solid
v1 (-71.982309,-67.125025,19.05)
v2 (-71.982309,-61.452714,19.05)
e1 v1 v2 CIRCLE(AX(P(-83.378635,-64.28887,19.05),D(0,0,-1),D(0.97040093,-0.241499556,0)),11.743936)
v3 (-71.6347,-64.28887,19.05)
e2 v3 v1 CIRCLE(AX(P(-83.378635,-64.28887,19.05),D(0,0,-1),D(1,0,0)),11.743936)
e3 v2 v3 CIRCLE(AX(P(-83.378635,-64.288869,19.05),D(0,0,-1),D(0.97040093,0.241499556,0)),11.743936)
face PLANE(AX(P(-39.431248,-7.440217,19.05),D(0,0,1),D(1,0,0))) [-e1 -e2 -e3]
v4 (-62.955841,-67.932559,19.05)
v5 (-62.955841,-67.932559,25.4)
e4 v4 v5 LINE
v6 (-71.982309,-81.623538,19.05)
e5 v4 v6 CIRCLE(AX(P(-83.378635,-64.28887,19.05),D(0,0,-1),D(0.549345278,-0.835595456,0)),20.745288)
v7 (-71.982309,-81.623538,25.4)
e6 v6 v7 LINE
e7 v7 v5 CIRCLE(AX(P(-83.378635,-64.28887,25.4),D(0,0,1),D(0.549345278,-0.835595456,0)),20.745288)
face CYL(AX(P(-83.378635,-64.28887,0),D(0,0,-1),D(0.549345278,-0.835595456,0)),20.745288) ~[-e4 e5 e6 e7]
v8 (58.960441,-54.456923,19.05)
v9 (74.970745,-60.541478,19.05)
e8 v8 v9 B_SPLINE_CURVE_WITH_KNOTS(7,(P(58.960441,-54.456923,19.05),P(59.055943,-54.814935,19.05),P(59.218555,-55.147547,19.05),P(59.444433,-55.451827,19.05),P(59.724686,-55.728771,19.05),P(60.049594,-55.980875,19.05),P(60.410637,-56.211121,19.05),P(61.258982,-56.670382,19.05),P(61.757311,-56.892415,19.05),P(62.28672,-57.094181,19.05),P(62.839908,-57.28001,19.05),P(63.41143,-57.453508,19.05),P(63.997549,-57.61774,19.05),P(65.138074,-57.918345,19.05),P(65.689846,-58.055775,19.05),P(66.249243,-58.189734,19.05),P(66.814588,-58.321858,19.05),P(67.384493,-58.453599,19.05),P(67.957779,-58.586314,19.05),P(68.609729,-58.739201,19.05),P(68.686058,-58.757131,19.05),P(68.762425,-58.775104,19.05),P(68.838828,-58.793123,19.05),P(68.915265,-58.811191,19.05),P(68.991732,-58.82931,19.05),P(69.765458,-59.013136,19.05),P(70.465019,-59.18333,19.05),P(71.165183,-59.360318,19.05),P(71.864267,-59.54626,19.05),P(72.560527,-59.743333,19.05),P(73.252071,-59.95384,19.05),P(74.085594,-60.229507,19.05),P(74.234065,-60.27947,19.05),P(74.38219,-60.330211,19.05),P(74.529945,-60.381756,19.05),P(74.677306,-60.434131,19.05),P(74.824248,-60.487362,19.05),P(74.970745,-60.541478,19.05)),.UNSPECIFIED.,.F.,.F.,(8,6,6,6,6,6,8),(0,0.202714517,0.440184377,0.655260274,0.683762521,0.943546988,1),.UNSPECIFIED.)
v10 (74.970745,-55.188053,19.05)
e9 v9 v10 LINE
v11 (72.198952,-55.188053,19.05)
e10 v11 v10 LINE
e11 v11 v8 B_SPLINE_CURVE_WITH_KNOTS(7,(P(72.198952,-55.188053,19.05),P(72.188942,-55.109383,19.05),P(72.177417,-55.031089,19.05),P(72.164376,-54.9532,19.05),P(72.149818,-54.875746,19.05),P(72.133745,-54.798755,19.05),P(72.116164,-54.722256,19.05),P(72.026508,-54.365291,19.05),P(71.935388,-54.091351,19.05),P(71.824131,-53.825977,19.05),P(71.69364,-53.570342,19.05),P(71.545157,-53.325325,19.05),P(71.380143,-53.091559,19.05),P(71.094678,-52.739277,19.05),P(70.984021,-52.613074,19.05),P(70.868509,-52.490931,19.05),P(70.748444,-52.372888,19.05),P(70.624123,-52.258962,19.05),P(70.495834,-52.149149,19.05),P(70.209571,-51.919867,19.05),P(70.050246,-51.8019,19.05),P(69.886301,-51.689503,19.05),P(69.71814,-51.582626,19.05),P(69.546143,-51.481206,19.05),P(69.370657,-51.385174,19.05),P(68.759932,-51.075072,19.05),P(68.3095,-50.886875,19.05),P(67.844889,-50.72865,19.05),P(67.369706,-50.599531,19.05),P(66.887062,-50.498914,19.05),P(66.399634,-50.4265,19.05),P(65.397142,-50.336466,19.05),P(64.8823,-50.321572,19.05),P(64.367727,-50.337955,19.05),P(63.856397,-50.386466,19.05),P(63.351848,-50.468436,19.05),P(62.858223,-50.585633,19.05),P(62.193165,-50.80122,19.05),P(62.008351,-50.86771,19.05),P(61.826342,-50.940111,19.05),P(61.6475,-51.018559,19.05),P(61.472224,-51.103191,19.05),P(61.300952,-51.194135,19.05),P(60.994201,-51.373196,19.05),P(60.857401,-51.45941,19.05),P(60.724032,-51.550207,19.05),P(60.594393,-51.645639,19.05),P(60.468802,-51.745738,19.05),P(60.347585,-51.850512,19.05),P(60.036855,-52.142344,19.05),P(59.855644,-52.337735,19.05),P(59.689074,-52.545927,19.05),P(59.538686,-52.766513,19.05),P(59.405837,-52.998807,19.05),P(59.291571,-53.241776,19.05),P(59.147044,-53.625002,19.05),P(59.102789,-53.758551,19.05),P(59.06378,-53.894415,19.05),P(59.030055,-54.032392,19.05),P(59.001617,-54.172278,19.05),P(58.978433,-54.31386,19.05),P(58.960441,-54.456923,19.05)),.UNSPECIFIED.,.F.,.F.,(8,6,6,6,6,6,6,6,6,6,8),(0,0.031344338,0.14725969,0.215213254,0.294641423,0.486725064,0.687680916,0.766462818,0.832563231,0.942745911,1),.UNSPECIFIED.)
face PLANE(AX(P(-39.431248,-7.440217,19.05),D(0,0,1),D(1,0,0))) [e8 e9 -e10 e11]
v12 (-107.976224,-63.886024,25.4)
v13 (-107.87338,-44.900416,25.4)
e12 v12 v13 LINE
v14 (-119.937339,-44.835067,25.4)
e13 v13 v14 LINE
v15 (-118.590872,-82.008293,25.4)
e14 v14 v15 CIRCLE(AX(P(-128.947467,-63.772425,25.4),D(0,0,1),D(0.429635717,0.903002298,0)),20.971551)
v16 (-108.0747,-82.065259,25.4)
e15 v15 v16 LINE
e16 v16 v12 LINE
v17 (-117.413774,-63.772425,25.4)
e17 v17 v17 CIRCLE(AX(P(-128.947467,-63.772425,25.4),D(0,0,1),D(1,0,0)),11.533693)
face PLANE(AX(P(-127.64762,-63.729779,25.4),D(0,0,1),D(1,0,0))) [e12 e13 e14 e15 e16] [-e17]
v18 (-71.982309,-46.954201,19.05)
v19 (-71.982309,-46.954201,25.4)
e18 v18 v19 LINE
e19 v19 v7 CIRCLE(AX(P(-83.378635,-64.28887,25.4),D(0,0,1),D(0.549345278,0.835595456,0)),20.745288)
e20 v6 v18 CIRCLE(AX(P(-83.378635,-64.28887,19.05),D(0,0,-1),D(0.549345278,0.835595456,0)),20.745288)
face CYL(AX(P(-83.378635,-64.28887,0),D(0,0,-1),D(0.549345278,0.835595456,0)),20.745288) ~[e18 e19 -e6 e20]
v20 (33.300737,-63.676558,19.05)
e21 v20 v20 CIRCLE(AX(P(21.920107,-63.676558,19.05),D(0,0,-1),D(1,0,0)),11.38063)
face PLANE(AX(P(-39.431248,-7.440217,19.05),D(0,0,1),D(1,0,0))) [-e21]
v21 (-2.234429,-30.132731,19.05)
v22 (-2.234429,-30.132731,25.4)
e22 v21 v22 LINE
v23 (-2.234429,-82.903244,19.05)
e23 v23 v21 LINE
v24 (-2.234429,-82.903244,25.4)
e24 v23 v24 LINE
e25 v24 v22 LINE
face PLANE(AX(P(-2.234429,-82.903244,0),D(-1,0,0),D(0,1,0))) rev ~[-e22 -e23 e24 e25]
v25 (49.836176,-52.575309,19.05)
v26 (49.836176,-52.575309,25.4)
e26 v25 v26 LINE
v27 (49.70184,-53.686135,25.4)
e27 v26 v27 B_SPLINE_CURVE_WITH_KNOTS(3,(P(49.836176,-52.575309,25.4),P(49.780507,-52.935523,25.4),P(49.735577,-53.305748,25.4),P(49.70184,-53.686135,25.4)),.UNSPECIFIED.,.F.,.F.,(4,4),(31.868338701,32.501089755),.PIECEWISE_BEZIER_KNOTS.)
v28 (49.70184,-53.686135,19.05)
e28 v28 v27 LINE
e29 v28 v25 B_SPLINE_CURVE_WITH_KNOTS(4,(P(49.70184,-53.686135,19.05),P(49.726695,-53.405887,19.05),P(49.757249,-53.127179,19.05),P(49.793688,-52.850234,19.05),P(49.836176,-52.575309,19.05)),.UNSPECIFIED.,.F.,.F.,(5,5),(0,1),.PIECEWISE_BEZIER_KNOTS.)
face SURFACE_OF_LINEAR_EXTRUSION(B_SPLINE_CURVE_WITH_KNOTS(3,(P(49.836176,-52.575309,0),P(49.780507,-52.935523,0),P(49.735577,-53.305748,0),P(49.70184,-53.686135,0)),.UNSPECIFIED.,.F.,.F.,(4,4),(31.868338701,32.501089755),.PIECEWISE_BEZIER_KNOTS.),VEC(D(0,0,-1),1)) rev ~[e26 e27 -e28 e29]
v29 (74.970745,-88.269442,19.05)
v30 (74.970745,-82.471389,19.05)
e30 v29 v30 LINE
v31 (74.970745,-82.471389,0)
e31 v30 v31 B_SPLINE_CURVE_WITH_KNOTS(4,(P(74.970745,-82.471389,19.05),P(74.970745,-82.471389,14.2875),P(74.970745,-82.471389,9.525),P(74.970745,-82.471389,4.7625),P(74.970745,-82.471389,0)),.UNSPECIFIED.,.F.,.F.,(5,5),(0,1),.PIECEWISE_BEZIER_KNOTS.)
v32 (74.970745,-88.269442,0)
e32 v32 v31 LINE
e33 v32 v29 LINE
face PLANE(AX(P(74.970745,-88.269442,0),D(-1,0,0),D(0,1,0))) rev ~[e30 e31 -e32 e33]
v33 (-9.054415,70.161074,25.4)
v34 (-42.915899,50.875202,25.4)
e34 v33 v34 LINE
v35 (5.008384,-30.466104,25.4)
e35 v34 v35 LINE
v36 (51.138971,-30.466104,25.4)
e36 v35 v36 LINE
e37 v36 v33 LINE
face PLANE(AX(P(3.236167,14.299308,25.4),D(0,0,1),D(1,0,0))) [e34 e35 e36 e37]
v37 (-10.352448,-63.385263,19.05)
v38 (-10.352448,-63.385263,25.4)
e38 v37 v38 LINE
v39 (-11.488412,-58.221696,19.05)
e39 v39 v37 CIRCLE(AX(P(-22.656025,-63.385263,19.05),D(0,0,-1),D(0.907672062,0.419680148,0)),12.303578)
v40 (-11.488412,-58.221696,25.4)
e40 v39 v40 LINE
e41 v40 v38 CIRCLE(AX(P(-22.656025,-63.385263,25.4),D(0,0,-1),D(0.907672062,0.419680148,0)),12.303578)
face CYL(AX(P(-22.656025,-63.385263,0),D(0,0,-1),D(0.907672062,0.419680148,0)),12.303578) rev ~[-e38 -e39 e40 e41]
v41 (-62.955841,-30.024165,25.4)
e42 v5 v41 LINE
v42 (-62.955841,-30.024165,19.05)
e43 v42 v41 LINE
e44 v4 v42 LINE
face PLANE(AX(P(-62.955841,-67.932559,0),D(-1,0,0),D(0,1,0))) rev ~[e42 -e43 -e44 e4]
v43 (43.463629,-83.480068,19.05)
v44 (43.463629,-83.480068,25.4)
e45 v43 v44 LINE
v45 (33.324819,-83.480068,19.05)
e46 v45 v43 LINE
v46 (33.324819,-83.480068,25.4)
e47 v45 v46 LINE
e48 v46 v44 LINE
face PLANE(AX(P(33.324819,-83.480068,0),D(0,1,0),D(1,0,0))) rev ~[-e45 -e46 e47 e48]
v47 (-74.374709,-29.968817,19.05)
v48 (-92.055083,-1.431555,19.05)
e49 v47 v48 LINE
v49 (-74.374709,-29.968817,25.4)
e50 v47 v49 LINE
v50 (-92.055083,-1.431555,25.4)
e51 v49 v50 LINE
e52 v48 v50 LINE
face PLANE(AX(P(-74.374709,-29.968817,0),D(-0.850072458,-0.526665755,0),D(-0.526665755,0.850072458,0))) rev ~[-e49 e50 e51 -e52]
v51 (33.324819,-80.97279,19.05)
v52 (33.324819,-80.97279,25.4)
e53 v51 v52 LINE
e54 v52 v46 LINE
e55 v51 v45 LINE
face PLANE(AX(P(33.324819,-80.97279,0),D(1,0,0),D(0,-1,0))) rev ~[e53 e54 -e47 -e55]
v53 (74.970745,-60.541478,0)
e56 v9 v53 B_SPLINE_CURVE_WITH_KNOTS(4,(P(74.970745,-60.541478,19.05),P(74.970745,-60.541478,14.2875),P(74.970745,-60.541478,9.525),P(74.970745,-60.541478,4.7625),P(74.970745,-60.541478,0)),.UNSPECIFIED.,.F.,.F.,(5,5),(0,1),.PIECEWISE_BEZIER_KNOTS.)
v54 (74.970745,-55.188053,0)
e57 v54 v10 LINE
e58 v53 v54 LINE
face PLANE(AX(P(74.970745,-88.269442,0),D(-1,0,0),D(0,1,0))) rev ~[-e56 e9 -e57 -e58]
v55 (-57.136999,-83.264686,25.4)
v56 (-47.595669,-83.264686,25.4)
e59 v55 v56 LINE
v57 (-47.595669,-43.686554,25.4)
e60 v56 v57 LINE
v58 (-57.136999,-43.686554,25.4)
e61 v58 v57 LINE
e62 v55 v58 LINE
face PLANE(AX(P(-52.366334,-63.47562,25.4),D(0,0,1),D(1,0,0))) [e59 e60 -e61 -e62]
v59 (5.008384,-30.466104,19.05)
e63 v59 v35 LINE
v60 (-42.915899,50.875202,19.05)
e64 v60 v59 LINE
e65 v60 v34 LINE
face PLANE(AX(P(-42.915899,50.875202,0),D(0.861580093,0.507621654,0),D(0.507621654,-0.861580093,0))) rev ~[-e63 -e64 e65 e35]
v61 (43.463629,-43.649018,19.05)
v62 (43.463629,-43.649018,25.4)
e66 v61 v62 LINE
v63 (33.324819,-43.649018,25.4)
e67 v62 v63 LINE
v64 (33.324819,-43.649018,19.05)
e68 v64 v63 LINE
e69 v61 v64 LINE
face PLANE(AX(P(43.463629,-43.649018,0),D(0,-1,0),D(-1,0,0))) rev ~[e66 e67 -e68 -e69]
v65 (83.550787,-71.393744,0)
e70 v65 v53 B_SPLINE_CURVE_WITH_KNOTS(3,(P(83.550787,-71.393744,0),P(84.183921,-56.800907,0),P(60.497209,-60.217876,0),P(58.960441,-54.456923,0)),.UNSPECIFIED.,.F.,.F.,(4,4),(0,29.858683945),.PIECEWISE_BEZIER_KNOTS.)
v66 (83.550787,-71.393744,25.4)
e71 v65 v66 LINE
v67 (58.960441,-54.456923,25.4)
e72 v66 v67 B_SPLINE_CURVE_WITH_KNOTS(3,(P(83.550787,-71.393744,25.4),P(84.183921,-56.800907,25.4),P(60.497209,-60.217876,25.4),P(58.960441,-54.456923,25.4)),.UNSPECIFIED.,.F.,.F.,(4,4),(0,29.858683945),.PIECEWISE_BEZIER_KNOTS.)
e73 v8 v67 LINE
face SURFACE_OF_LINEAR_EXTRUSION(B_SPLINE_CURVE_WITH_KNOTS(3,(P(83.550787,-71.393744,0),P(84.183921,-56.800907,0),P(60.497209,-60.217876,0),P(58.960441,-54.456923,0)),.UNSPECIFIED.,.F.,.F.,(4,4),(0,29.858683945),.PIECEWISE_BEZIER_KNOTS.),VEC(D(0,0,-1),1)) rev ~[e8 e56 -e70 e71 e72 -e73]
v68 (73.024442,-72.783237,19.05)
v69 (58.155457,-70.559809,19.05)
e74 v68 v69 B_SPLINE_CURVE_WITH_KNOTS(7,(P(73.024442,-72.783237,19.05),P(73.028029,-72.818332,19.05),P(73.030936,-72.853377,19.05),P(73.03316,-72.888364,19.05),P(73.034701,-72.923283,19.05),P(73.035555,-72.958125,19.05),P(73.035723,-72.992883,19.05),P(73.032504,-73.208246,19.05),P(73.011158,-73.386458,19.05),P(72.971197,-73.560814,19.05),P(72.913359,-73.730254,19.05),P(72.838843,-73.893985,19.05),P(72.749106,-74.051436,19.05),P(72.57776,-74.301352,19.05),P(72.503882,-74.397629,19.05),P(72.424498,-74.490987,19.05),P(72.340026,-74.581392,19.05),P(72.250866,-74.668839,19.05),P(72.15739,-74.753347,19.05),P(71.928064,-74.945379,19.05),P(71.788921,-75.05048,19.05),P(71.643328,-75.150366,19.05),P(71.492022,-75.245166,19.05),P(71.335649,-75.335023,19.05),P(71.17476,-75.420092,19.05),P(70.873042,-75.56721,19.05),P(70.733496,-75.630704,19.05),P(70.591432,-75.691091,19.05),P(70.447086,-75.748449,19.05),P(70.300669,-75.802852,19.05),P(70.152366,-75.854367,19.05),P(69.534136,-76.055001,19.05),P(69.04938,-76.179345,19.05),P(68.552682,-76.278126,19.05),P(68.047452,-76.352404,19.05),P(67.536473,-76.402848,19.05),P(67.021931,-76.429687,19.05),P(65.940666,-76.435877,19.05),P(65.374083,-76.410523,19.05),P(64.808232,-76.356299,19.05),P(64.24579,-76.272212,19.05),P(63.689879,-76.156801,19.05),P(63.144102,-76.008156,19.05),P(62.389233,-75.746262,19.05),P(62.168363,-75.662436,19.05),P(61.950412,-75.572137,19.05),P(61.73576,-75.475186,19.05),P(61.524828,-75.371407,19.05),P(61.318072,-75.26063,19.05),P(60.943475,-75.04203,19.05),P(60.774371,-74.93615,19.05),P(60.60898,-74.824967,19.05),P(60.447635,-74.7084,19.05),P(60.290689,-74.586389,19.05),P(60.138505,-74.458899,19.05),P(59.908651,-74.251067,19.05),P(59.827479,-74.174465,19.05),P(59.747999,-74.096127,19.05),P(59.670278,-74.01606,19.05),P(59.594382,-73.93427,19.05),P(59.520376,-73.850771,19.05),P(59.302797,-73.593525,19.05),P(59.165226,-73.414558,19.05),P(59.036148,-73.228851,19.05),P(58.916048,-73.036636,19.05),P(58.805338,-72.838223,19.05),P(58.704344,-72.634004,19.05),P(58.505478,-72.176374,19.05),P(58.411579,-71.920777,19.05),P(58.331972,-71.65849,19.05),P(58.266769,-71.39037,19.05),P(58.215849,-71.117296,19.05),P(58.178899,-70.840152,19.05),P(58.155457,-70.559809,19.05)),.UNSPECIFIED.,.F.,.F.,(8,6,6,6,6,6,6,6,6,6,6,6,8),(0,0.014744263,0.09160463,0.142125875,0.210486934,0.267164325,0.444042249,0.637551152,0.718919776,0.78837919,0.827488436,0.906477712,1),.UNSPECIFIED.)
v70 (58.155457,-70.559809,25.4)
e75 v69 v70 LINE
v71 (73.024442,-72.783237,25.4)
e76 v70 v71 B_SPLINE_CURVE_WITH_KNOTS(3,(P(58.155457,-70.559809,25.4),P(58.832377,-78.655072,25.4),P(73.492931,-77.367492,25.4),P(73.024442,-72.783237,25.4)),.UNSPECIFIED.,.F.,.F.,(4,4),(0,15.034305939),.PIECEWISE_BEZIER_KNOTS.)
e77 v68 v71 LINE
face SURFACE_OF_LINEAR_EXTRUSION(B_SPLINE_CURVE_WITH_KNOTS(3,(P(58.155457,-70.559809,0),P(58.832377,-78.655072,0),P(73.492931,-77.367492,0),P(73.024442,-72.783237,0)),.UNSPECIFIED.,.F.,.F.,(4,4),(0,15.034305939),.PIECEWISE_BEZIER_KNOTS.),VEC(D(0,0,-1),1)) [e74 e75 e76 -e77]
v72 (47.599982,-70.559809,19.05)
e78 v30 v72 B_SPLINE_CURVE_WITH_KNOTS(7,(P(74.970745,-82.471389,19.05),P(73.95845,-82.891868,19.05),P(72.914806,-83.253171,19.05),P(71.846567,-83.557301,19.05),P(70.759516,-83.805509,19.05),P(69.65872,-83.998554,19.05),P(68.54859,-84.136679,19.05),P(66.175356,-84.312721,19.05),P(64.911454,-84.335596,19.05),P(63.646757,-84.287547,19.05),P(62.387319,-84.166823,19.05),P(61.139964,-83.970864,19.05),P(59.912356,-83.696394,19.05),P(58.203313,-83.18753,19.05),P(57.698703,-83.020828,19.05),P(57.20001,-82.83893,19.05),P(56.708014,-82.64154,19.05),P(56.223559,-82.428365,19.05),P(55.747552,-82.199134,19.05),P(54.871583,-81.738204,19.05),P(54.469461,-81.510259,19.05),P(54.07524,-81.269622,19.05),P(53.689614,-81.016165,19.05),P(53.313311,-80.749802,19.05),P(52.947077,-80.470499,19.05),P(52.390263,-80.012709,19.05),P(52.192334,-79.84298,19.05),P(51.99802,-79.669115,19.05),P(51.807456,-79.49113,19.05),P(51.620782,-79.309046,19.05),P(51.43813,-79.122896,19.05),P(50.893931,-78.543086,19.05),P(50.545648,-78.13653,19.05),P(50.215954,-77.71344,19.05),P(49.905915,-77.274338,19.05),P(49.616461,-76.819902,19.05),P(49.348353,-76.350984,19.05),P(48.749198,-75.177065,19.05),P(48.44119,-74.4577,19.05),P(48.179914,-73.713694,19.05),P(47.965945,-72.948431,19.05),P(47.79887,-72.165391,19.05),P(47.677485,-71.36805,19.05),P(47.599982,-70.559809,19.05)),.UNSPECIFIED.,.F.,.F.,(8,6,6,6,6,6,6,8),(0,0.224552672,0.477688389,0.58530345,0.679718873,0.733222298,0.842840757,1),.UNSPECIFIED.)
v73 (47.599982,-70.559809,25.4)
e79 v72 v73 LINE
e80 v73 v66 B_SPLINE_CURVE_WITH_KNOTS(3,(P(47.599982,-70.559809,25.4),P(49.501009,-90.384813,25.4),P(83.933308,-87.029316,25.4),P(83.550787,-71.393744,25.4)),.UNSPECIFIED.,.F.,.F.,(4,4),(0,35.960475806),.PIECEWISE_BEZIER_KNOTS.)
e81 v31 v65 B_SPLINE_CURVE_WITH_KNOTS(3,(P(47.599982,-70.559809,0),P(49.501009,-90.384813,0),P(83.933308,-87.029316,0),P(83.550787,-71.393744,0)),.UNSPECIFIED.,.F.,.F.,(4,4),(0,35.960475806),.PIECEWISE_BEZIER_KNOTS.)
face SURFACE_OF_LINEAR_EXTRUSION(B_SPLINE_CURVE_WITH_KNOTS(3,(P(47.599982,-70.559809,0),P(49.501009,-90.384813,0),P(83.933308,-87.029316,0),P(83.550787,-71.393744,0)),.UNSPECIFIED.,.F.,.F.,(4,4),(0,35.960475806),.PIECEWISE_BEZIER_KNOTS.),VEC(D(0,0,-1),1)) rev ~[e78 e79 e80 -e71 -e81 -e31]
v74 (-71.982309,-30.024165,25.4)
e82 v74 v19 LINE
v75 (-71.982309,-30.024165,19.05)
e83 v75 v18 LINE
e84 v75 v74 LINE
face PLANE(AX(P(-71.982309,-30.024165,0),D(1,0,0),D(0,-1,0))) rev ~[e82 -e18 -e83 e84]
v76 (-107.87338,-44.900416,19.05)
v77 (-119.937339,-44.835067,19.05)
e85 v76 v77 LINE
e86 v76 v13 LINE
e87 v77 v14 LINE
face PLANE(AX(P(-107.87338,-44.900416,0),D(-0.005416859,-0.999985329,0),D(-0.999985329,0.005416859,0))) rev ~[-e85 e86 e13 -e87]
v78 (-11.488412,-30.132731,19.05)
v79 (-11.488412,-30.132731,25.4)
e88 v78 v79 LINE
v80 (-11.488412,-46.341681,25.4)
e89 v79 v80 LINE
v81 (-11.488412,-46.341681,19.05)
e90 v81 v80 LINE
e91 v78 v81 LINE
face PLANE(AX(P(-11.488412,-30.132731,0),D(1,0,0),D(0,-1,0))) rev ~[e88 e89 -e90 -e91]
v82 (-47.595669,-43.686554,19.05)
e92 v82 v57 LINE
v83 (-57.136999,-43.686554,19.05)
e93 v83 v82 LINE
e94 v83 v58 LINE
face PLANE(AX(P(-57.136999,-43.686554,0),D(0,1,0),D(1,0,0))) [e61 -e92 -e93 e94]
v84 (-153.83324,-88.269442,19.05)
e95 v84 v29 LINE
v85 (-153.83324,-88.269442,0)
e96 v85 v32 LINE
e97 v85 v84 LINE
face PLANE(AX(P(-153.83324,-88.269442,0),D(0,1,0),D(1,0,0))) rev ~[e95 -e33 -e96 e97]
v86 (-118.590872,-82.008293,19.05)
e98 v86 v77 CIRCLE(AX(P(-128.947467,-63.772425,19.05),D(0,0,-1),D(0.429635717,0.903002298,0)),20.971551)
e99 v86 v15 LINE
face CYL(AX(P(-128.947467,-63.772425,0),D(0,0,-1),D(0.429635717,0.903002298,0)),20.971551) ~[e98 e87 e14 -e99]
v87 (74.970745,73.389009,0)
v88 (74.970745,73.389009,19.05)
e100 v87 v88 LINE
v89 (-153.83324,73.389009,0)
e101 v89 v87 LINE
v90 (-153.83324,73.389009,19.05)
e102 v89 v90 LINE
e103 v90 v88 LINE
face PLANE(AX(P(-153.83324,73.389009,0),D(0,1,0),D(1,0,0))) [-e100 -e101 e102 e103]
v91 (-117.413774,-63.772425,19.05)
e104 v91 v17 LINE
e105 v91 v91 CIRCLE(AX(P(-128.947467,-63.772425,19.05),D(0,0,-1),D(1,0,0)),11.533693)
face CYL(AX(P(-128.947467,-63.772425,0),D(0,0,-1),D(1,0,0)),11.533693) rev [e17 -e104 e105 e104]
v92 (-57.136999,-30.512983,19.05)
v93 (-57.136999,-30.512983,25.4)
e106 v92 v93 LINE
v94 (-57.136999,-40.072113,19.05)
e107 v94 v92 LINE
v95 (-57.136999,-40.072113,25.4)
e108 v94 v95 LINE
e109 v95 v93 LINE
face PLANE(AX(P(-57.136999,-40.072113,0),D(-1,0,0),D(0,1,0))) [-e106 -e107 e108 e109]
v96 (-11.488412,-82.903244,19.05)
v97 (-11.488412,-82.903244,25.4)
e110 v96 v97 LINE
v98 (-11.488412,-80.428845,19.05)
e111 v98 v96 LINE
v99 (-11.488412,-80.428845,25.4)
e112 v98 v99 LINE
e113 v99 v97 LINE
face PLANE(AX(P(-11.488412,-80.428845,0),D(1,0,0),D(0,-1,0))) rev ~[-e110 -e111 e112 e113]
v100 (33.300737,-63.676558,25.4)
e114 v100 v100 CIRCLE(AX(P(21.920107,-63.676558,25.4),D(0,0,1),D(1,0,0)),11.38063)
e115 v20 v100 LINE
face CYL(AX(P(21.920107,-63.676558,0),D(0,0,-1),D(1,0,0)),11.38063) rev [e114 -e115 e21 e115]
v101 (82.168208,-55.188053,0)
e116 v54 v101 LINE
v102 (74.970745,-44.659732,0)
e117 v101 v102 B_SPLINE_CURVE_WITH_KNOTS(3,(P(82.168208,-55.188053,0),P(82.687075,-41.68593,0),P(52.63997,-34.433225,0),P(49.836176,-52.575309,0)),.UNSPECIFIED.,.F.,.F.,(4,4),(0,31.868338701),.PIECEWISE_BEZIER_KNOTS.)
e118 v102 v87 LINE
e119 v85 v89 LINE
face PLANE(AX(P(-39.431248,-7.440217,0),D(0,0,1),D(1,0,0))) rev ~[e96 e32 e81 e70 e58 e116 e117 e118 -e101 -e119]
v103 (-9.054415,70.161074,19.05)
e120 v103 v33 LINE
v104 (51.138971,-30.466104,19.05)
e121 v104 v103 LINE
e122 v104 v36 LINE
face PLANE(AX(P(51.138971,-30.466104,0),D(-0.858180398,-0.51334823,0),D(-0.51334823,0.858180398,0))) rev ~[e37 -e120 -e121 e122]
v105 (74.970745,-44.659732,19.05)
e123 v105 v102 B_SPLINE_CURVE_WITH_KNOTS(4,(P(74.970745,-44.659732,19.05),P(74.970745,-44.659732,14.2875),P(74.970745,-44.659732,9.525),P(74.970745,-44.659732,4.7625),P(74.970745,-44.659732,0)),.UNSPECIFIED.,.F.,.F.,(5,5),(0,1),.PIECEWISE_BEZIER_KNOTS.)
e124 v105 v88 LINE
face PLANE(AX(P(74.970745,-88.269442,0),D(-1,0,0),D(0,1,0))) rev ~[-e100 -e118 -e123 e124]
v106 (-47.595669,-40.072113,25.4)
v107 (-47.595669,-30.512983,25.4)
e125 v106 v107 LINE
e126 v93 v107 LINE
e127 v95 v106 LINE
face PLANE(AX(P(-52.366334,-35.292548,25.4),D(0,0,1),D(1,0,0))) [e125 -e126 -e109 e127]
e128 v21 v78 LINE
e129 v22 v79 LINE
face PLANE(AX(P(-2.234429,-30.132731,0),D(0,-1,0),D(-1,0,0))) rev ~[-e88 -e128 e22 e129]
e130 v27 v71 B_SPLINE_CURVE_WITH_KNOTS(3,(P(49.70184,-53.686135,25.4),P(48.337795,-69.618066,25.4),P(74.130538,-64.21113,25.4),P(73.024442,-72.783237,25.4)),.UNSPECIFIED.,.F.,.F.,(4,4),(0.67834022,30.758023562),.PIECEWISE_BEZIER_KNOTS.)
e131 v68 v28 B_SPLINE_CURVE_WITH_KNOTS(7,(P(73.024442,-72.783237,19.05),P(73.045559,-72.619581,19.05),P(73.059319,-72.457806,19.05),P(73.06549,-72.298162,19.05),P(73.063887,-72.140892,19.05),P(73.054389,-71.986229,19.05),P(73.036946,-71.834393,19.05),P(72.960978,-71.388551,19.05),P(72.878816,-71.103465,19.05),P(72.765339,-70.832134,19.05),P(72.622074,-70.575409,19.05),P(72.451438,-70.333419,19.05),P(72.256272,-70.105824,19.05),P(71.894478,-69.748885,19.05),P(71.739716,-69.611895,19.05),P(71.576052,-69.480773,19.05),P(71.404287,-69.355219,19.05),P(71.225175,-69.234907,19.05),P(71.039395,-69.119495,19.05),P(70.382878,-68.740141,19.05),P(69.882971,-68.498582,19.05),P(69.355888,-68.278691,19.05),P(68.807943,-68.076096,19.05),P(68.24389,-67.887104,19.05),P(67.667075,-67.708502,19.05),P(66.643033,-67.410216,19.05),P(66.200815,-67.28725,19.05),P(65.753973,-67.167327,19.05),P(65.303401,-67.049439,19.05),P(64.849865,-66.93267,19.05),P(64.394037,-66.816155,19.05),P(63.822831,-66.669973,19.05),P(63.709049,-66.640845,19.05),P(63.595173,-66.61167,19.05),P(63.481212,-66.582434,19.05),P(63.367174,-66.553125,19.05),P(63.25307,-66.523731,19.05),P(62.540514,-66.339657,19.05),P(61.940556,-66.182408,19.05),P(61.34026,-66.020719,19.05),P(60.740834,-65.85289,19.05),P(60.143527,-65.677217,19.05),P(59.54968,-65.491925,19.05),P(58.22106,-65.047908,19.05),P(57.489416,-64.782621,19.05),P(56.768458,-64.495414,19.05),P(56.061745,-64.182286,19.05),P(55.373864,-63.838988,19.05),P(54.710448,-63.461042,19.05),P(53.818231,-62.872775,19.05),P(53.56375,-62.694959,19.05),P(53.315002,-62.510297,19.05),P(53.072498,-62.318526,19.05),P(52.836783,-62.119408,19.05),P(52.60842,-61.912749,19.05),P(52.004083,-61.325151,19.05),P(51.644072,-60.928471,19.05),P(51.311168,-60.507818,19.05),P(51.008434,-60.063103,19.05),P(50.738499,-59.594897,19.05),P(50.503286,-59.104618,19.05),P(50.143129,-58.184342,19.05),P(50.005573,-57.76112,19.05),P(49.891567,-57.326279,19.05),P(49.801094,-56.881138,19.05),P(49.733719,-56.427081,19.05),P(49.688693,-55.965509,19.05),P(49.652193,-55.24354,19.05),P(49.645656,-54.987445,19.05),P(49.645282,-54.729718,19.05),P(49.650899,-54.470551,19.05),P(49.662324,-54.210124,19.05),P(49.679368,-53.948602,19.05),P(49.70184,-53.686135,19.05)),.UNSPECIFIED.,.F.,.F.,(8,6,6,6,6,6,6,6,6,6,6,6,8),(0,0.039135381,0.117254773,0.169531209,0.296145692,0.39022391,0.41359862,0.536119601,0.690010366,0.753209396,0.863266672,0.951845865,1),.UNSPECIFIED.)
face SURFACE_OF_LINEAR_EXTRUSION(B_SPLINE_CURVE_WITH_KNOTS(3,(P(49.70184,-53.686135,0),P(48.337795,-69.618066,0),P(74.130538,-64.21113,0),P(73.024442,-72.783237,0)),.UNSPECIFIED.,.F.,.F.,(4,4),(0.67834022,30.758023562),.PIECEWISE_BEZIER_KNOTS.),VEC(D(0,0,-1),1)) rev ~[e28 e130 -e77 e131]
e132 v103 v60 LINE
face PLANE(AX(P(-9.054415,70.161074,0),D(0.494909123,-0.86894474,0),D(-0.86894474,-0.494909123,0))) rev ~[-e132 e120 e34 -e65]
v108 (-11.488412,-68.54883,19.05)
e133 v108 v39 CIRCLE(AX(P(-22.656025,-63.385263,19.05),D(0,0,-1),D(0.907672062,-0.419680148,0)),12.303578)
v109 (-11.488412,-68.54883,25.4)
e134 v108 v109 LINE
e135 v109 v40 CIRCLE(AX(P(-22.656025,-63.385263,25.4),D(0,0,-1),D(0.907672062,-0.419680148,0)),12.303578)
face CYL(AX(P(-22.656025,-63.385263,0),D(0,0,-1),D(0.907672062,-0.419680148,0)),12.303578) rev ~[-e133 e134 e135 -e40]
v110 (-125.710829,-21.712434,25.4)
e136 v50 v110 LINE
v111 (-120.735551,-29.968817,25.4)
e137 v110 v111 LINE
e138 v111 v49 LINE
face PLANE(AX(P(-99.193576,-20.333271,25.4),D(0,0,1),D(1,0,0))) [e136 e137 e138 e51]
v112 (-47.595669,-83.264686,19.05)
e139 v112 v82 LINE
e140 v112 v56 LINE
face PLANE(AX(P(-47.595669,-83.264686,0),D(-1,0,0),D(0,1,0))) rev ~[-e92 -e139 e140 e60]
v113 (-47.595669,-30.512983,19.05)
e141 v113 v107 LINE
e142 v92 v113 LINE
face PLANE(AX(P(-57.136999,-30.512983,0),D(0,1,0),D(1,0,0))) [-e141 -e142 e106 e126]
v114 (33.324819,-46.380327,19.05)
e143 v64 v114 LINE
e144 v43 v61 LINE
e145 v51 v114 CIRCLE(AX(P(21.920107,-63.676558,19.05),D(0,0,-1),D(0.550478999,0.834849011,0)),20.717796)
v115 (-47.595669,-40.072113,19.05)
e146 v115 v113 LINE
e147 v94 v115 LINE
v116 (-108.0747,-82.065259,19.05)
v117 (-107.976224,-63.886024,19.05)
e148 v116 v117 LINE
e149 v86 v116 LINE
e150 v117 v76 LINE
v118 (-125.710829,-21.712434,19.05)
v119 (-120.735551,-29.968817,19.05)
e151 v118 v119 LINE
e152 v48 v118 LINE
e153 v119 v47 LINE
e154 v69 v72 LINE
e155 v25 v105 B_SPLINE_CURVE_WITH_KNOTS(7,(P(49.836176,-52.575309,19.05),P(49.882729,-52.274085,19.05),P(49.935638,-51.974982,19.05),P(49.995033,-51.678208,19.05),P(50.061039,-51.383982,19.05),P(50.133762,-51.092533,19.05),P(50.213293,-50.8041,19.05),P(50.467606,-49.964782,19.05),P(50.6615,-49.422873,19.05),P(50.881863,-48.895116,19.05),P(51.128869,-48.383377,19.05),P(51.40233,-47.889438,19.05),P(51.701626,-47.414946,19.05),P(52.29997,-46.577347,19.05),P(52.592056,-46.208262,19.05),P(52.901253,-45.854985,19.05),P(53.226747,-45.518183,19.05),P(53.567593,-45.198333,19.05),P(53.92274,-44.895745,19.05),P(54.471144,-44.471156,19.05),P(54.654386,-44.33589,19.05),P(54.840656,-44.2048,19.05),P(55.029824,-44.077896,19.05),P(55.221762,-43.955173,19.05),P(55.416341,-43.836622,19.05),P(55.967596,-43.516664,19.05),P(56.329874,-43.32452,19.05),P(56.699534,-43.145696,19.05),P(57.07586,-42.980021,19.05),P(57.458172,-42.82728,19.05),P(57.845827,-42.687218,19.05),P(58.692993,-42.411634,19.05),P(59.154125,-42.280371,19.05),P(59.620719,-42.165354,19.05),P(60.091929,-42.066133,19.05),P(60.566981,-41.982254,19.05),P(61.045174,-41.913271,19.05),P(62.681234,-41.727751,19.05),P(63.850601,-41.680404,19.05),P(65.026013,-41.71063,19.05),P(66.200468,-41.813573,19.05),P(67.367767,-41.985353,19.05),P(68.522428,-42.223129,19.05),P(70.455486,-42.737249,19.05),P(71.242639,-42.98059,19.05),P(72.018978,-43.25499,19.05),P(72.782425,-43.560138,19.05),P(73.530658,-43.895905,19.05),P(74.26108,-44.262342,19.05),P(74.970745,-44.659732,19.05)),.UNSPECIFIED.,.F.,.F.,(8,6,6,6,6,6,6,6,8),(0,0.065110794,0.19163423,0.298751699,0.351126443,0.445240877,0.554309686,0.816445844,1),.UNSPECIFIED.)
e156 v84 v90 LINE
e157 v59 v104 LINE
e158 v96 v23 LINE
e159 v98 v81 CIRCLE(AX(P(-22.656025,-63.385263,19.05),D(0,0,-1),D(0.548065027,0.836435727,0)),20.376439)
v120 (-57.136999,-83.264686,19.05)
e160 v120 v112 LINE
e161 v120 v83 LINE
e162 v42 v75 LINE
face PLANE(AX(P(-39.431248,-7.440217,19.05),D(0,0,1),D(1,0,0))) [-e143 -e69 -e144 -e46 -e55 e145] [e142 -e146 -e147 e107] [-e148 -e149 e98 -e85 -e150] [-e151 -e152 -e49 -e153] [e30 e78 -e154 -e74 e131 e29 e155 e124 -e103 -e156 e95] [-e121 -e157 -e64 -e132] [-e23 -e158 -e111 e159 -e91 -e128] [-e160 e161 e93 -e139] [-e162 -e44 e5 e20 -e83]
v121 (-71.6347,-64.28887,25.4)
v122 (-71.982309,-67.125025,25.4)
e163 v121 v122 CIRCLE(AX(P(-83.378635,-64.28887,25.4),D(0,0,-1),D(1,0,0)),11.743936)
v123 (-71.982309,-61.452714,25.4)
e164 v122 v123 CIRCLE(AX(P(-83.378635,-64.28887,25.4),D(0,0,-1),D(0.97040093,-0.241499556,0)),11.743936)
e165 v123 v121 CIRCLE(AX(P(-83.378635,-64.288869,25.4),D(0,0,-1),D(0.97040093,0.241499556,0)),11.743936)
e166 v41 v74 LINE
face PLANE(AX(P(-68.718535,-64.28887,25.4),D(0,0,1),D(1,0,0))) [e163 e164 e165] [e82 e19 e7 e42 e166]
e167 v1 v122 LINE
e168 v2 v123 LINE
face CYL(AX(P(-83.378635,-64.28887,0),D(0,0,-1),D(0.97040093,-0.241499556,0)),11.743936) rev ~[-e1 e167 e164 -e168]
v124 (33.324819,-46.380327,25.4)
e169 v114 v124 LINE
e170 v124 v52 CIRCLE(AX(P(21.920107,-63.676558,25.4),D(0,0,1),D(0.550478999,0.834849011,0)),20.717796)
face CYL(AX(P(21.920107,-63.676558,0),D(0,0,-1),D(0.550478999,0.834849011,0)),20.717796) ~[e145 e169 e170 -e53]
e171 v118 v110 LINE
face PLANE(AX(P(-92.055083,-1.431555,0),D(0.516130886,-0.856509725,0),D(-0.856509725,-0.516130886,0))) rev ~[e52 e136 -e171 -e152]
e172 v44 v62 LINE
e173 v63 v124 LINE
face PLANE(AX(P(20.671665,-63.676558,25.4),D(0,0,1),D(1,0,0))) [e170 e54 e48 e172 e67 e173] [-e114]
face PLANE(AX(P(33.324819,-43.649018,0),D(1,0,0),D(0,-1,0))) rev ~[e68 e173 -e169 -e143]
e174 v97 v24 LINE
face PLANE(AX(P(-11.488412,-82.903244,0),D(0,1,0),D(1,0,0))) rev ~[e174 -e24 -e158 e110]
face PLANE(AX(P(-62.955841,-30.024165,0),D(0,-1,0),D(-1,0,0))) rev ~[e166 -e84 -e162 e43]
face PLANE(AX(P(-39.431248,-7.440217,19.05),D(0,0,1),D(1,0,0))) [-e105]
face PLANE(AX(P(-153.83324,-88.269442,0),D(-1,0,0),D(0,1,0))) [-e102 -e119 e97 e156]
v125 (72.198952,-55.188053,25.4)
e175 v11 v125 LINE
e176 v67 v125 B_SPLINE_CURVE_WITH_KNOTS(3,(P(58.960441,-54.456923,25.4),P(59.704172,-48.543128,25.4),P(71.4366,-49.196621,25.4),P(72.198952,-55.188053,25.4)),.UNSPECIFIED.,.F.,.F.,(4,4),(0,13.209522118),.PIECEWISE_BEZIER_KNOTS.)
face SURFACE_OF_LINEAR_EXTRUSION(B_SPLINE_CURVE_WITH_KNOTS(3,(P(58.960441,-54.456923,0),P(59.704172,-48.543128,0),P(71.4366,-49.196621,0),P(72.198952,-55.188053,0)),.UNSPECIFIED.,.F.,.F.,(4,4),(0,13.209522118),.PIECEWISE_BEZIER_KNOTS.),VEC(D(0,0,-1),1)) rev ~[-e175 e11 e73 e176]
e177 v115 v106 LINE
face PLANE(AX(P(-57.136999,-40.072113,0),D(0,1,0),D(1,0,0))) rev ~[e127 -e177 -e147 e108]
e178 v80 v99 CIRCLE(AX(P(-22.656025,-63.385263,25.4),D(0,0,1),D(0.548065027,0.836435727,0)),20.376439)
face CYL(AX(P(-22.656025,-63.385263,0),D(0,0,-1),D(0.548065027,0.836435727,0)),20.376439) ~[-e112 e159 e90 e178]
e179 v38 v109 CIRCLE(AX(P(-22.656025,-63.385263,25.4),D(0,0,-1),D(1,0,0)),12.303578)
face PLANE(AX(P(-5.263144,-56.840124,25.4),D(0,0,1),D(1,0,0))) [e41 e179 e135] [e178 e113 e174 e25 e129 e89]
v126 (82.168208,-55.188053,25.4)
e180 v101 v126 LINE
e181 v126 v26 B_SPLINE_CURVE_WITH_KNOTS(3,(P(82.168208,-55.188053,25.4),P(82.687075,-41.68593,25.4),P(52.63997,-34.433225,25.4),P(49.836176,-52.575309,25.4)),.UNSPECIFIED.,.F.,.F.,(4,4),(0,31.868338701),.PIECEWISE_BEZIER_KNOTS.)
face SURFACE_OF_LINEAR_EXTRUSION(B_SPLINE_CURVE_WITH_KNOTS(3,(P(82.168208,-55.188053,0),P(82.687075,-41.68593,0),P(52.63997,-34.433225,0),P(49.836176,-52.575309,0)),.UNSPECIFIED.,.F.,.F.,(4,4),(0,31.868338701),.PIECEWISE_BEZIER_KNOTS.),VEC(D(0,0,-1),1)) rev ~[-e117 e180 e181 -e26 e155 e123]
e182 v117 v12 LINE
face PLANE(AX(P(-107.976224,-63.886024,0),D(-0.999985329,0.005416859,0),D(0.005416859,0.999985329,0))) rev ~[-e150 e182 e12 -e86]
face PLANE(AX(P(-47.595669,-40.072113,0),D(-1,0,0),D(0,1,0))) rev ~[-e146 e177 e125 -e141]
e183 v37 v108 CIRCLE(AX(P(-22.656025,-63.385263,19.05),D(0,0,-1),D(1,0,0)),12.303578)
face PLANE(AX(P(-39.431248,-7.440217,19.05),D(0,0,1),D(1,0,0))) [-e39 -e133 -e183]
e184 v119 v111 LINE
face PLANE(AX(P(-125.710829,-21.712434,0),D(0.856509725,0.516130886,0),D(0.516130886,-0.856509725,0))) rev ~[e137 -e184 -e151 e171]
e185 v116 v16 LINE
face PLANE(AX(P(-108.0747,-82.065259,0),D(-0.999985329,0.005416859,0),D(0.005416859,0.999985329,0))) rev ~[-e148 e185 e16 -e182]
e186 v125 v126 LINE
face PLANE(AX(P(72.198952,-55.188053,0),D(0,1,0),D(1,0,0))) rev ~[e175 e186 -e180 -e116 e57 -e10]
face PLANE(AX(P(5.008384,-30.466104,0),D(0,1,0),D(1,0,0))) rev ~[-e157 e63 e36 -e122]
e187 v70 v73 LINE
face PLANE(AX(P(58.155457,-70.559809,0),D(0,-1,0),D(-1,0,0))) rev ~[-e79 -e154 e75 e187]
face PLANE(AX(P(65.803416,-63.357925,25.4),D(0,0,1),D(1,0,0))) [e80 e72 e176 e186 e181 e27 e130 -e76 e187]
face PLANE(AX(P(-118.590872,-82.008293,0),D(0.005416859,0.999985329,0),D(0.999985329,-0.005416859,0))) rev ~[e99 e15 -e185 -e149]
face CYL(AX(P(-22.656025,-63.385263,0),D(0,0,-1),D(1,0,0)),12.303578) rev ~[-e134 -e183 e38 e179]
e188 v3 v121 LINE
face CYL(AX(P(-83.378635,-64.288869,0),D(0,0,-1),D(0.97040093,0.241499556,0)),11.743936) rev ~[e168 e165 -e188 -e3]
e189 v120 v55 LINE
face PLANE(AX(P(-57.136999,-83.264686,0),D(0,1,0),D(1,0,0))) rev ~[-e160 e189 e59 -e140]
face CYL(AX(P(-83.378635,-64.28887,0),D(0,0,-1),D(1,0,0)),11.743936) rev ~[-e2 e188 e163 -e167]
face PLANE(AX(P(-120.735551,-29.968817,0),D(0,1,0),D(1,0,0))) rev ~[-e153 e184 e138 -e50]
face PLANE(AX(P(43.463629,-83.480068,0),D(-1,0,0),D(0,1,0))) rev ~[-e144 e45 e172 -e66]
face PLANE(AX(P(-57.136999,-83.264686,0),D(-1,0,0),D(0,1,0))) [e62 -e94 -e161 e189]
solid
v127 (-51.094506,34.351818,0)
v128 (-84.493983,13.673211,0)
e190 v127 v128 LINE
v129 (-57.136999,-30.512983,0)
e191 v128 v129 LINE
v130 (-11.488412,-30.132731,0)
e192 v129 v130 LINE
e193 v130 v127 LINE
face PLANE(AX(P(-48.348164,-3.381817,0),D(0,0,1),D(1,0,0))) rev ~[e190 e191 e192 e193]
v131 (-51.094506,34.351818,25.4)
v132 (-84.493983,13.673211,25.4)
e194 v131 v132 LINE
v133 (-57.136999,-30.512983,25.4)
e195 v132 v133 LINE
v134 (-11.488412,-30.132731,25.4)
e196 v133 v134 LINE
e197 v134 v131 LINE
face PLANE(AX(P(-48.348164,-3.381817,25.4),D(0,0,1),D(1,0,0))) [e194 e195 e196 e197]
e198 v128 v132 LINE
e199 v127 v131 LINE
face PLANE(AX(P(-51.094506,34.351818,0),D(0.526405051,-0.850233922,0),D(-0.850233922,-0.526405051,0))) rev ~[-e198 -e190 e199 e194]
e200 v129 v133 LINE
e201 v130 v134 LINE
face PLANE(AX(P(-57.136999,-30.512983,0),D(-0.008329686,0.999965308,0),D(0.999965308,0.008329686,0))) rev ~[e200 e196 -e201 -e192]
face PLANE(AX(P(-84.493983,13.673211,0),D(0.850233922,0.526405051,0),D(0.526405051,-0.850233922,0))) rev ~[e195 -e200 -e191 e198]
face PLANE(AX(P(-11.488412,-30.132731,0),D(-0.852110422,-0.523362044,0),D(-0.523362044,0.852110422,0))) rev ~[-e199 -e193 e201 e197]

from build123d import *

# Parameters (mm, degrees)
F2_DEPTH = 25.4
F0_R     = 11.5336925559
F0_W     = 9.541330096
F0_H     = 39.5781323314
F0_R_2   = 11.380629632
F0_H_2   = 9.5591302517
F1_W     = 228.8039848208
F1_H     = 161.6584509611
F3_DEPTH = 19.05


with BuildPart() as f2:
    # F0 (on Top) → F2 (new body)
    with BuildSketch(Plane.XY):
        Polygon((-51.0945059359, 34.3518182635), (-84.4939826515, 13.6732111501), (-57.1369986801, -30.5129830238), (-11.4884115756, -30.1327314228), align=None)
    extrude(amount=F2_DEPTH)


with BuildPart() as f2b:
    # F0 (on Top) → F2, piece 2 (new body)
    with BuildSketch(Plane.XY):
        with BuildLine():
            ThreePointArc((-107.9762237087, -63.8860243261), (-107.9759929518, -63.8292248991), (-107.9759160326, -63.7724250555))
            ThreePointArc((-107.9759160326, -63.7724250555), (-111.2166703627, -52.5731037336), (-119.9373394473, -44.8350666817))
            ThreePointArc((-119.9373394473, -44.8350666817), (-149.9052734682, -64.5315465682), (-118.5908724142, -82.0082932916))
            ThreePointArc((-118.5908724142, -82.0082932916), (-110.851541588, -74.3716434809), (-107.9762237087, -63.8860243261))
        make_face()
        with Locations((-128.9474666119, -63.7724250555)):
            Circle(F0_R, mode=Mode.SUBTRACT)
        with BuildLine():
            ThreePointArc((-119.9373394473, -44.8350666817), (-111.2166703627, -52.5731037336), (-107.9759160326, -63.7724250555))
            ThreePointArc((-107.9759160326, -63.7724250555), (-107.9759929518, -63.8292248991), (-107.9762237087, -63.8860243261))
            Line((-107.9762237087, -63.8860243261), (-107.8733798367, -44.9004164099))
            Line((-107.8733798367, -44.9004164099), (-119.9373394473, -44.8350666817))
        make_face()
        with BuildLine():
            Line((-108.074699505, -82.0652587543), (-107.9762237087, -63.8860243261))
            ThreePointArc((-107.9762237087, -63.8860243261), (-110.851541588, -74.3716434809), (-118.5908724142, -82.0082932916))
            Line((-118.5908724142, -82.0082932916), (-108.074699505, -82.0652587543))
        make_face()
    extrude(amount=F2_DEPTH)



with BuildPart() as f2c:
    # F0 (on Top) → F2, piece 3 (new body)
    with BuildSketch(Plane.XY):
        Polygon((-92.0550826628, -1.4315552488), (-125.7108291716, -21.712434453), (-120.7355512429, -29.968816787), (-74.3747093637, -29.968816787), align=None)
    extrude(amount=F2_DEPTH)


with BuildPart() as f2d:
    # F0 (on Top) → F2, piece 4 (new body)
    with BuildSketch(Plane.XY):
        with BuildLine():
            ThreePointArc((-62.9558414221, -60.6451802377), (-66.0588539194, -52.8699310888), (-71.9823092222, -46.9542009427))
            Line((-71.9823092222, -46.9542009427), (-71.9823092222, -61.4527142385))
            ThreePointArc((-71.9823092222, -61.4527142385), (-71.7219259683, -62.8601804955), (-71.6346996434, -64.2888695002))
            ThreePointArc((-71.6346996434, -64.2888695002), (-71.7219259683, -65.7175585048), (-71.9823092222, -67.1250247618))
            Line((-71.9823092222, -67.1250247618), (-71.9823092222, -81.6235380576))
            ThreePointArc((-71.9823092222, -81.6235380576), (-66.0588539194, -75.7078079115), (-62.9558414221, -67.9325587626))
            Line((-62.9558414221, -67.9325587626), (-62.9558414221, -60.6451802377))
        make_face()
        with BuildLine():
            Line((-62.9558414221, -30.0241652876), (-71.9823092222, -30.0241652876))
            Line((-71.9823092222, -30.0241652876), (-71.9823092222, -46.9542009427))
            ThreePointArc((-71.9823092222, -46.9542009427), (-66.0588539194, -52.8699310888), (-62.9558414221, -60.6451802377))
            Line((-62.9558414221, -60.6451802377), (-62.9558414221, -30.0241652876))
        make_face()
        with BuildLine():
            Line((-71.9823092222, -61.4527142385), (-71.9823092222, -46.9542009427))
            ThreePointArc((-71.9823092222, -46.9542009427), (-104.1239235622, -64.2888695002), (-71.9823092222, -81.6235380576))
            Line((-71.9823092222, -81.6235380576), (-71.9823092222, -67.1250247618))
            ThreePointArc((-71.9823092222, -67.1250247618), (-95.1225710504, -64.2888695002), (-71.9823092222, -61.4527142385))
        make_face()
    extrude(amount=F2_DEPTH)


with BuildPart() as f2e:
    # F0 (on Top) → F2, piece 5 (new body)
    with BuildSketch(Plane.XY):
        with Locations((-52.3663336321, -63.4756200016)):
            Rectangle(F0_W, F0_H)
    extrude(amount=F2_DEPTH)


with BuildPart() as f2f:
    # F0 (on Top) → F2, piece 6 (new body)
    with BuildSketch(Plane.XY):
        with BuildLine():
            Line((-2.2344286554, -30.1327314228), (-11.4884115756, -30.1327314228))
            Line((-11.4884115756, -30.1327314228), (-11.4884115756, -46.3416812132))
            ThreePointArc((-11.4884115756, -46.3416812132), (-4.7290138195, -53.6991112265), (-2.2795860101, -63.3852630854))
            ThreePointArc((-2.2795860101, -63.3852630854), (-4.7290138195, -73.0714149442), (-11.4884115756, -80.4288449576))
            Line((-11.4884115756, -80.4288449576), (-11.4884115756, -82.9032436013))
            Line((-11.4884115756, -82.9032436013), (-2.2344286554, -82.9032436013))
            Line((-2.2344286554, -82.9032436013), (-2.2344286554, -30.1327314228))
        make_face()
        with BuildLine():
            Line((-11.4884115756, -58.2216957499), (-11.4884115756, -46.3416812132))
            ThreePointArc((-11.4884115756, -46.3416812132), (-43.0324647199, -63.3852630854), (-11.4884115756, -80.4288449576))
            Line((-11.4884115756, -80.4288449576), (-11.4884115756, -68.5488304208))
            ThreePointArc((-11.4884115756, -68.5488304208), (-34.959603112, -63.3852630854), (-11.4884115756, -58.2216957499))
        make_face()
        with BuildLine():
            ThreePointArc((-2.2795860101, -63.3852630854), (-4.7290138195, -53.6991112265), (-11.4884115756, -46.3416812132))
            Line((-11.4884115756, -46.3416812132), (-11.4884115756, -58.2216957499))
            ThreePointArc((-11.4884115756, -58.2216957499), (-10.639794053, -60.7417407315), (-10.3524476179, -63.3852630854))
            ThreePointArc((-10.3524476179, -63.3852630854), (-10.639794053, -66.0287854392), (-11.4884115756, -68.5488304208))
            Line((-11.4884115756, -68.5488304208), (-11.4884115756, -80.4288449576))
            ThreePointArc((-11.4884115756, -80.4288449576), (-4.7290138195, -73.0714149442), (-2.2795860101, -63.3852630854))
        make_face()
    extrude(amount=F2_DEPTH)


with BuildPart() as f2g:
    # F0 (on Top) → F2, piece 7 (new body)
    with BuildSketch(Plane.XY):
        with BuildLine():
            Line((33.3248190582, -80.9727901538), (33.3248190582, -46.3803267161))
            ThreePointArc((33.3248190582, -46.3803267161), (1.2023110457, -63.676558435), (33.3248190582, -80.9727901538))
        make_face()
        with Locations((21.920107305, -63.676558435)):
            Circle(F0_R_2, mode=Mode.SUBTRACT)
        with BuildLine():
            ThreePointArc((33.3248190582, -80.9727901538), (40.1616474859, -73.4986403768), (42.6379035644, -63.676558435))
            ThreePointArc((42.6379035644, -63.676558435), (40.1616474859, -53.8544764931), (33.3248190582, -46.3803267161))
            Line((33.3248190582, -46.3803267161), (33.3248190582, -80.9727901538))
        make_face()
        with BuildLine():
            ThreePointArc((33.3248190582, -46.3803267161), (40.1616474859, -53.8544764931), (42.6379035644, -63.676558435))
            ThreePointArc((42.6379035644, -63.676558435), (40.1616474859, -73.4986403768), (33.3248190582, -80.9727901538))
            Line((33.3248190582, -80.9727901538), (33.3248190582, -83.4800675511))
            Line((33.3248190582, -83.4800675511), (43.4636287391, -83.4800675511))
            Line((43.4636287391, -83.4800675511), (43.4636287391, -43.6490178108))
            Line((43.4636287391, -43.6490178108), (33.3248190582, -43.6490178108))
            Line((33.3248190582, -43.6490178108), (33.3248190582, -46.3803267161))
        make_face()
    extrude(amount=F2_DEPTH)


with BuildPart() as f2h:
    # F0 (on Top) → F2, piece 8 (new body)
    with BuildSketch(Plane.XY):
        with BuildLine():
            Line((58.1554566098, -70.5598088785), (47.5999824703, -70.5598088785))
            add(Edge.make_bspline(
                [(47.5999824703, -70.5598088785), (49.5010092854, -90.3848129197), (83.9333076226, -87.0293162841), (83.5507873642, -71.3937439102)],
                knots=[0, 0, 0, 0, 35.9604758055, 35.9604758055, 35.9604758055, 35.9604758055], degree=3))
            add(Edge.make_bspline(
                [(83.5507873642, -71.3937439102), (84.1839209979, -56.8009070249), (60.4972094297, -60.2178759873), (58.9604414999, -54.456923157)],
                knots=[0, 0, 0, 0, 29.8586839454, 29.8586839454, 29.8586839454, 29.8586839454], degree=3))
            add(Edge.make_bspline(
                [(58.9604414999, -54.456923157), (59.7041723272, -48.5431283295), (71.4366002474, -49.1966214378), (72.1989516421, -55.1880527146)],
                knots=[0, 0, 0, 0, 13.2095221181, 13.2095221181, 13.2095221181, 13.2095221181], degree=3))
            Line((72.1989516421, -55.1880527146), (82.1682080838, -55.1880527146))
            add(Edge.make_bspline(
                [(82.1682080838, -55.1880527146), (82.6870746879, -41.6859303163), (52.6399704235, -34.4332249736), (49.8361763634, -52.5753086121)],
                knots=[0, 0, 0, 0, 31.868338701, 31.868338701, 31.868338701, 31.868338701], degree=3))
            add(Edge.make_bspline(
                [(49.8361763634, -52.5753086121), (49.7805065758, -52.9355226367), (49.7355768501, -53.3057479852), (49.7018396854, -53.6861345172)],
                knots=[31.868338701, 31.868338701, 31.868338701, 31.868338701, 32.5010897548, 32.5010897548, 32.5010897548, 32.5010897548], degree=3))
            add(Edge.make_bspline(
                [(49.7018396854, -53.6861345172), (48.3377947774, -69.6180662759), (74.1305380627, -64.2111304974), (73.0244419212, -72.7832366078)],
                knots=[0.6783402198, 0.6783402198, 0.6783402198, 0.6783402198, 30.7580235623, 30.7580235623, 30.7580235623, 30.7580235623], degree=3))
            add(Edge.make_bspline(
                [(58.1554566098, -70.5598088785), (58.8323771954, -78.6550715566), (73.4929313503, -77.367492494), (73.0244419212, -72.7832366078)],
                knots=[0, 0, 0, 0, 15.0343059386, 15.0343059386, 15.0343059386, 15.0343059386], degree=3))
        make_face()
    extrude(amount=F2_DEPTH)


with BuildPart() as f2i:
    # F0 (on Top) → F2, piece 9 (new body)
    with BuildSketch(Plane.XY):
        Polygon((-9.054414928, 70.1610743999), (-42.9158993065, 50.8752018213), (5.0083836541, -30.4661039263), (51.1389710009, -30.4661039263), align=None)
    extrude(amount=F2_DEPTH)


with BuildPart() as f2j:
    # F0 (on Top) → F2, piece 10 (new body)
    with BuildSketch(Plane.XY):
        with Locations((-52.3663336321, -35.2925481497)):
            Rectangle(F0_W, F0_H_2)
    extrude(amount=F2_DEPTH)


with BuildPart() as f2b_1:
    add(f2b.part)

    add(f2c.part)  # F3 merges F2c

    add(f2d.part)  # F3 merges F2d

    add(f2e.part)  # F3 merges F2e

    add(f2f.part)  # F3 merges F2f

    add(f2g.part)  # F3 merges F2g

    add(f2h.part)  # F3 merges F2h

    add(f2i.part)  # F3 merges F2i

    add(f2j.part)  # F3 merges F2j
    # F1 (on Top) → F3 (join)
    with BuildSketch(Plane.XY):
        with Locations((-39.4312478602, -7.4402168393)):
            Rectangle(F1_W, F1_H)
    extrude(amount=F3_DEPTH)


solid = Compound([f2.part, f2b_1.part])
